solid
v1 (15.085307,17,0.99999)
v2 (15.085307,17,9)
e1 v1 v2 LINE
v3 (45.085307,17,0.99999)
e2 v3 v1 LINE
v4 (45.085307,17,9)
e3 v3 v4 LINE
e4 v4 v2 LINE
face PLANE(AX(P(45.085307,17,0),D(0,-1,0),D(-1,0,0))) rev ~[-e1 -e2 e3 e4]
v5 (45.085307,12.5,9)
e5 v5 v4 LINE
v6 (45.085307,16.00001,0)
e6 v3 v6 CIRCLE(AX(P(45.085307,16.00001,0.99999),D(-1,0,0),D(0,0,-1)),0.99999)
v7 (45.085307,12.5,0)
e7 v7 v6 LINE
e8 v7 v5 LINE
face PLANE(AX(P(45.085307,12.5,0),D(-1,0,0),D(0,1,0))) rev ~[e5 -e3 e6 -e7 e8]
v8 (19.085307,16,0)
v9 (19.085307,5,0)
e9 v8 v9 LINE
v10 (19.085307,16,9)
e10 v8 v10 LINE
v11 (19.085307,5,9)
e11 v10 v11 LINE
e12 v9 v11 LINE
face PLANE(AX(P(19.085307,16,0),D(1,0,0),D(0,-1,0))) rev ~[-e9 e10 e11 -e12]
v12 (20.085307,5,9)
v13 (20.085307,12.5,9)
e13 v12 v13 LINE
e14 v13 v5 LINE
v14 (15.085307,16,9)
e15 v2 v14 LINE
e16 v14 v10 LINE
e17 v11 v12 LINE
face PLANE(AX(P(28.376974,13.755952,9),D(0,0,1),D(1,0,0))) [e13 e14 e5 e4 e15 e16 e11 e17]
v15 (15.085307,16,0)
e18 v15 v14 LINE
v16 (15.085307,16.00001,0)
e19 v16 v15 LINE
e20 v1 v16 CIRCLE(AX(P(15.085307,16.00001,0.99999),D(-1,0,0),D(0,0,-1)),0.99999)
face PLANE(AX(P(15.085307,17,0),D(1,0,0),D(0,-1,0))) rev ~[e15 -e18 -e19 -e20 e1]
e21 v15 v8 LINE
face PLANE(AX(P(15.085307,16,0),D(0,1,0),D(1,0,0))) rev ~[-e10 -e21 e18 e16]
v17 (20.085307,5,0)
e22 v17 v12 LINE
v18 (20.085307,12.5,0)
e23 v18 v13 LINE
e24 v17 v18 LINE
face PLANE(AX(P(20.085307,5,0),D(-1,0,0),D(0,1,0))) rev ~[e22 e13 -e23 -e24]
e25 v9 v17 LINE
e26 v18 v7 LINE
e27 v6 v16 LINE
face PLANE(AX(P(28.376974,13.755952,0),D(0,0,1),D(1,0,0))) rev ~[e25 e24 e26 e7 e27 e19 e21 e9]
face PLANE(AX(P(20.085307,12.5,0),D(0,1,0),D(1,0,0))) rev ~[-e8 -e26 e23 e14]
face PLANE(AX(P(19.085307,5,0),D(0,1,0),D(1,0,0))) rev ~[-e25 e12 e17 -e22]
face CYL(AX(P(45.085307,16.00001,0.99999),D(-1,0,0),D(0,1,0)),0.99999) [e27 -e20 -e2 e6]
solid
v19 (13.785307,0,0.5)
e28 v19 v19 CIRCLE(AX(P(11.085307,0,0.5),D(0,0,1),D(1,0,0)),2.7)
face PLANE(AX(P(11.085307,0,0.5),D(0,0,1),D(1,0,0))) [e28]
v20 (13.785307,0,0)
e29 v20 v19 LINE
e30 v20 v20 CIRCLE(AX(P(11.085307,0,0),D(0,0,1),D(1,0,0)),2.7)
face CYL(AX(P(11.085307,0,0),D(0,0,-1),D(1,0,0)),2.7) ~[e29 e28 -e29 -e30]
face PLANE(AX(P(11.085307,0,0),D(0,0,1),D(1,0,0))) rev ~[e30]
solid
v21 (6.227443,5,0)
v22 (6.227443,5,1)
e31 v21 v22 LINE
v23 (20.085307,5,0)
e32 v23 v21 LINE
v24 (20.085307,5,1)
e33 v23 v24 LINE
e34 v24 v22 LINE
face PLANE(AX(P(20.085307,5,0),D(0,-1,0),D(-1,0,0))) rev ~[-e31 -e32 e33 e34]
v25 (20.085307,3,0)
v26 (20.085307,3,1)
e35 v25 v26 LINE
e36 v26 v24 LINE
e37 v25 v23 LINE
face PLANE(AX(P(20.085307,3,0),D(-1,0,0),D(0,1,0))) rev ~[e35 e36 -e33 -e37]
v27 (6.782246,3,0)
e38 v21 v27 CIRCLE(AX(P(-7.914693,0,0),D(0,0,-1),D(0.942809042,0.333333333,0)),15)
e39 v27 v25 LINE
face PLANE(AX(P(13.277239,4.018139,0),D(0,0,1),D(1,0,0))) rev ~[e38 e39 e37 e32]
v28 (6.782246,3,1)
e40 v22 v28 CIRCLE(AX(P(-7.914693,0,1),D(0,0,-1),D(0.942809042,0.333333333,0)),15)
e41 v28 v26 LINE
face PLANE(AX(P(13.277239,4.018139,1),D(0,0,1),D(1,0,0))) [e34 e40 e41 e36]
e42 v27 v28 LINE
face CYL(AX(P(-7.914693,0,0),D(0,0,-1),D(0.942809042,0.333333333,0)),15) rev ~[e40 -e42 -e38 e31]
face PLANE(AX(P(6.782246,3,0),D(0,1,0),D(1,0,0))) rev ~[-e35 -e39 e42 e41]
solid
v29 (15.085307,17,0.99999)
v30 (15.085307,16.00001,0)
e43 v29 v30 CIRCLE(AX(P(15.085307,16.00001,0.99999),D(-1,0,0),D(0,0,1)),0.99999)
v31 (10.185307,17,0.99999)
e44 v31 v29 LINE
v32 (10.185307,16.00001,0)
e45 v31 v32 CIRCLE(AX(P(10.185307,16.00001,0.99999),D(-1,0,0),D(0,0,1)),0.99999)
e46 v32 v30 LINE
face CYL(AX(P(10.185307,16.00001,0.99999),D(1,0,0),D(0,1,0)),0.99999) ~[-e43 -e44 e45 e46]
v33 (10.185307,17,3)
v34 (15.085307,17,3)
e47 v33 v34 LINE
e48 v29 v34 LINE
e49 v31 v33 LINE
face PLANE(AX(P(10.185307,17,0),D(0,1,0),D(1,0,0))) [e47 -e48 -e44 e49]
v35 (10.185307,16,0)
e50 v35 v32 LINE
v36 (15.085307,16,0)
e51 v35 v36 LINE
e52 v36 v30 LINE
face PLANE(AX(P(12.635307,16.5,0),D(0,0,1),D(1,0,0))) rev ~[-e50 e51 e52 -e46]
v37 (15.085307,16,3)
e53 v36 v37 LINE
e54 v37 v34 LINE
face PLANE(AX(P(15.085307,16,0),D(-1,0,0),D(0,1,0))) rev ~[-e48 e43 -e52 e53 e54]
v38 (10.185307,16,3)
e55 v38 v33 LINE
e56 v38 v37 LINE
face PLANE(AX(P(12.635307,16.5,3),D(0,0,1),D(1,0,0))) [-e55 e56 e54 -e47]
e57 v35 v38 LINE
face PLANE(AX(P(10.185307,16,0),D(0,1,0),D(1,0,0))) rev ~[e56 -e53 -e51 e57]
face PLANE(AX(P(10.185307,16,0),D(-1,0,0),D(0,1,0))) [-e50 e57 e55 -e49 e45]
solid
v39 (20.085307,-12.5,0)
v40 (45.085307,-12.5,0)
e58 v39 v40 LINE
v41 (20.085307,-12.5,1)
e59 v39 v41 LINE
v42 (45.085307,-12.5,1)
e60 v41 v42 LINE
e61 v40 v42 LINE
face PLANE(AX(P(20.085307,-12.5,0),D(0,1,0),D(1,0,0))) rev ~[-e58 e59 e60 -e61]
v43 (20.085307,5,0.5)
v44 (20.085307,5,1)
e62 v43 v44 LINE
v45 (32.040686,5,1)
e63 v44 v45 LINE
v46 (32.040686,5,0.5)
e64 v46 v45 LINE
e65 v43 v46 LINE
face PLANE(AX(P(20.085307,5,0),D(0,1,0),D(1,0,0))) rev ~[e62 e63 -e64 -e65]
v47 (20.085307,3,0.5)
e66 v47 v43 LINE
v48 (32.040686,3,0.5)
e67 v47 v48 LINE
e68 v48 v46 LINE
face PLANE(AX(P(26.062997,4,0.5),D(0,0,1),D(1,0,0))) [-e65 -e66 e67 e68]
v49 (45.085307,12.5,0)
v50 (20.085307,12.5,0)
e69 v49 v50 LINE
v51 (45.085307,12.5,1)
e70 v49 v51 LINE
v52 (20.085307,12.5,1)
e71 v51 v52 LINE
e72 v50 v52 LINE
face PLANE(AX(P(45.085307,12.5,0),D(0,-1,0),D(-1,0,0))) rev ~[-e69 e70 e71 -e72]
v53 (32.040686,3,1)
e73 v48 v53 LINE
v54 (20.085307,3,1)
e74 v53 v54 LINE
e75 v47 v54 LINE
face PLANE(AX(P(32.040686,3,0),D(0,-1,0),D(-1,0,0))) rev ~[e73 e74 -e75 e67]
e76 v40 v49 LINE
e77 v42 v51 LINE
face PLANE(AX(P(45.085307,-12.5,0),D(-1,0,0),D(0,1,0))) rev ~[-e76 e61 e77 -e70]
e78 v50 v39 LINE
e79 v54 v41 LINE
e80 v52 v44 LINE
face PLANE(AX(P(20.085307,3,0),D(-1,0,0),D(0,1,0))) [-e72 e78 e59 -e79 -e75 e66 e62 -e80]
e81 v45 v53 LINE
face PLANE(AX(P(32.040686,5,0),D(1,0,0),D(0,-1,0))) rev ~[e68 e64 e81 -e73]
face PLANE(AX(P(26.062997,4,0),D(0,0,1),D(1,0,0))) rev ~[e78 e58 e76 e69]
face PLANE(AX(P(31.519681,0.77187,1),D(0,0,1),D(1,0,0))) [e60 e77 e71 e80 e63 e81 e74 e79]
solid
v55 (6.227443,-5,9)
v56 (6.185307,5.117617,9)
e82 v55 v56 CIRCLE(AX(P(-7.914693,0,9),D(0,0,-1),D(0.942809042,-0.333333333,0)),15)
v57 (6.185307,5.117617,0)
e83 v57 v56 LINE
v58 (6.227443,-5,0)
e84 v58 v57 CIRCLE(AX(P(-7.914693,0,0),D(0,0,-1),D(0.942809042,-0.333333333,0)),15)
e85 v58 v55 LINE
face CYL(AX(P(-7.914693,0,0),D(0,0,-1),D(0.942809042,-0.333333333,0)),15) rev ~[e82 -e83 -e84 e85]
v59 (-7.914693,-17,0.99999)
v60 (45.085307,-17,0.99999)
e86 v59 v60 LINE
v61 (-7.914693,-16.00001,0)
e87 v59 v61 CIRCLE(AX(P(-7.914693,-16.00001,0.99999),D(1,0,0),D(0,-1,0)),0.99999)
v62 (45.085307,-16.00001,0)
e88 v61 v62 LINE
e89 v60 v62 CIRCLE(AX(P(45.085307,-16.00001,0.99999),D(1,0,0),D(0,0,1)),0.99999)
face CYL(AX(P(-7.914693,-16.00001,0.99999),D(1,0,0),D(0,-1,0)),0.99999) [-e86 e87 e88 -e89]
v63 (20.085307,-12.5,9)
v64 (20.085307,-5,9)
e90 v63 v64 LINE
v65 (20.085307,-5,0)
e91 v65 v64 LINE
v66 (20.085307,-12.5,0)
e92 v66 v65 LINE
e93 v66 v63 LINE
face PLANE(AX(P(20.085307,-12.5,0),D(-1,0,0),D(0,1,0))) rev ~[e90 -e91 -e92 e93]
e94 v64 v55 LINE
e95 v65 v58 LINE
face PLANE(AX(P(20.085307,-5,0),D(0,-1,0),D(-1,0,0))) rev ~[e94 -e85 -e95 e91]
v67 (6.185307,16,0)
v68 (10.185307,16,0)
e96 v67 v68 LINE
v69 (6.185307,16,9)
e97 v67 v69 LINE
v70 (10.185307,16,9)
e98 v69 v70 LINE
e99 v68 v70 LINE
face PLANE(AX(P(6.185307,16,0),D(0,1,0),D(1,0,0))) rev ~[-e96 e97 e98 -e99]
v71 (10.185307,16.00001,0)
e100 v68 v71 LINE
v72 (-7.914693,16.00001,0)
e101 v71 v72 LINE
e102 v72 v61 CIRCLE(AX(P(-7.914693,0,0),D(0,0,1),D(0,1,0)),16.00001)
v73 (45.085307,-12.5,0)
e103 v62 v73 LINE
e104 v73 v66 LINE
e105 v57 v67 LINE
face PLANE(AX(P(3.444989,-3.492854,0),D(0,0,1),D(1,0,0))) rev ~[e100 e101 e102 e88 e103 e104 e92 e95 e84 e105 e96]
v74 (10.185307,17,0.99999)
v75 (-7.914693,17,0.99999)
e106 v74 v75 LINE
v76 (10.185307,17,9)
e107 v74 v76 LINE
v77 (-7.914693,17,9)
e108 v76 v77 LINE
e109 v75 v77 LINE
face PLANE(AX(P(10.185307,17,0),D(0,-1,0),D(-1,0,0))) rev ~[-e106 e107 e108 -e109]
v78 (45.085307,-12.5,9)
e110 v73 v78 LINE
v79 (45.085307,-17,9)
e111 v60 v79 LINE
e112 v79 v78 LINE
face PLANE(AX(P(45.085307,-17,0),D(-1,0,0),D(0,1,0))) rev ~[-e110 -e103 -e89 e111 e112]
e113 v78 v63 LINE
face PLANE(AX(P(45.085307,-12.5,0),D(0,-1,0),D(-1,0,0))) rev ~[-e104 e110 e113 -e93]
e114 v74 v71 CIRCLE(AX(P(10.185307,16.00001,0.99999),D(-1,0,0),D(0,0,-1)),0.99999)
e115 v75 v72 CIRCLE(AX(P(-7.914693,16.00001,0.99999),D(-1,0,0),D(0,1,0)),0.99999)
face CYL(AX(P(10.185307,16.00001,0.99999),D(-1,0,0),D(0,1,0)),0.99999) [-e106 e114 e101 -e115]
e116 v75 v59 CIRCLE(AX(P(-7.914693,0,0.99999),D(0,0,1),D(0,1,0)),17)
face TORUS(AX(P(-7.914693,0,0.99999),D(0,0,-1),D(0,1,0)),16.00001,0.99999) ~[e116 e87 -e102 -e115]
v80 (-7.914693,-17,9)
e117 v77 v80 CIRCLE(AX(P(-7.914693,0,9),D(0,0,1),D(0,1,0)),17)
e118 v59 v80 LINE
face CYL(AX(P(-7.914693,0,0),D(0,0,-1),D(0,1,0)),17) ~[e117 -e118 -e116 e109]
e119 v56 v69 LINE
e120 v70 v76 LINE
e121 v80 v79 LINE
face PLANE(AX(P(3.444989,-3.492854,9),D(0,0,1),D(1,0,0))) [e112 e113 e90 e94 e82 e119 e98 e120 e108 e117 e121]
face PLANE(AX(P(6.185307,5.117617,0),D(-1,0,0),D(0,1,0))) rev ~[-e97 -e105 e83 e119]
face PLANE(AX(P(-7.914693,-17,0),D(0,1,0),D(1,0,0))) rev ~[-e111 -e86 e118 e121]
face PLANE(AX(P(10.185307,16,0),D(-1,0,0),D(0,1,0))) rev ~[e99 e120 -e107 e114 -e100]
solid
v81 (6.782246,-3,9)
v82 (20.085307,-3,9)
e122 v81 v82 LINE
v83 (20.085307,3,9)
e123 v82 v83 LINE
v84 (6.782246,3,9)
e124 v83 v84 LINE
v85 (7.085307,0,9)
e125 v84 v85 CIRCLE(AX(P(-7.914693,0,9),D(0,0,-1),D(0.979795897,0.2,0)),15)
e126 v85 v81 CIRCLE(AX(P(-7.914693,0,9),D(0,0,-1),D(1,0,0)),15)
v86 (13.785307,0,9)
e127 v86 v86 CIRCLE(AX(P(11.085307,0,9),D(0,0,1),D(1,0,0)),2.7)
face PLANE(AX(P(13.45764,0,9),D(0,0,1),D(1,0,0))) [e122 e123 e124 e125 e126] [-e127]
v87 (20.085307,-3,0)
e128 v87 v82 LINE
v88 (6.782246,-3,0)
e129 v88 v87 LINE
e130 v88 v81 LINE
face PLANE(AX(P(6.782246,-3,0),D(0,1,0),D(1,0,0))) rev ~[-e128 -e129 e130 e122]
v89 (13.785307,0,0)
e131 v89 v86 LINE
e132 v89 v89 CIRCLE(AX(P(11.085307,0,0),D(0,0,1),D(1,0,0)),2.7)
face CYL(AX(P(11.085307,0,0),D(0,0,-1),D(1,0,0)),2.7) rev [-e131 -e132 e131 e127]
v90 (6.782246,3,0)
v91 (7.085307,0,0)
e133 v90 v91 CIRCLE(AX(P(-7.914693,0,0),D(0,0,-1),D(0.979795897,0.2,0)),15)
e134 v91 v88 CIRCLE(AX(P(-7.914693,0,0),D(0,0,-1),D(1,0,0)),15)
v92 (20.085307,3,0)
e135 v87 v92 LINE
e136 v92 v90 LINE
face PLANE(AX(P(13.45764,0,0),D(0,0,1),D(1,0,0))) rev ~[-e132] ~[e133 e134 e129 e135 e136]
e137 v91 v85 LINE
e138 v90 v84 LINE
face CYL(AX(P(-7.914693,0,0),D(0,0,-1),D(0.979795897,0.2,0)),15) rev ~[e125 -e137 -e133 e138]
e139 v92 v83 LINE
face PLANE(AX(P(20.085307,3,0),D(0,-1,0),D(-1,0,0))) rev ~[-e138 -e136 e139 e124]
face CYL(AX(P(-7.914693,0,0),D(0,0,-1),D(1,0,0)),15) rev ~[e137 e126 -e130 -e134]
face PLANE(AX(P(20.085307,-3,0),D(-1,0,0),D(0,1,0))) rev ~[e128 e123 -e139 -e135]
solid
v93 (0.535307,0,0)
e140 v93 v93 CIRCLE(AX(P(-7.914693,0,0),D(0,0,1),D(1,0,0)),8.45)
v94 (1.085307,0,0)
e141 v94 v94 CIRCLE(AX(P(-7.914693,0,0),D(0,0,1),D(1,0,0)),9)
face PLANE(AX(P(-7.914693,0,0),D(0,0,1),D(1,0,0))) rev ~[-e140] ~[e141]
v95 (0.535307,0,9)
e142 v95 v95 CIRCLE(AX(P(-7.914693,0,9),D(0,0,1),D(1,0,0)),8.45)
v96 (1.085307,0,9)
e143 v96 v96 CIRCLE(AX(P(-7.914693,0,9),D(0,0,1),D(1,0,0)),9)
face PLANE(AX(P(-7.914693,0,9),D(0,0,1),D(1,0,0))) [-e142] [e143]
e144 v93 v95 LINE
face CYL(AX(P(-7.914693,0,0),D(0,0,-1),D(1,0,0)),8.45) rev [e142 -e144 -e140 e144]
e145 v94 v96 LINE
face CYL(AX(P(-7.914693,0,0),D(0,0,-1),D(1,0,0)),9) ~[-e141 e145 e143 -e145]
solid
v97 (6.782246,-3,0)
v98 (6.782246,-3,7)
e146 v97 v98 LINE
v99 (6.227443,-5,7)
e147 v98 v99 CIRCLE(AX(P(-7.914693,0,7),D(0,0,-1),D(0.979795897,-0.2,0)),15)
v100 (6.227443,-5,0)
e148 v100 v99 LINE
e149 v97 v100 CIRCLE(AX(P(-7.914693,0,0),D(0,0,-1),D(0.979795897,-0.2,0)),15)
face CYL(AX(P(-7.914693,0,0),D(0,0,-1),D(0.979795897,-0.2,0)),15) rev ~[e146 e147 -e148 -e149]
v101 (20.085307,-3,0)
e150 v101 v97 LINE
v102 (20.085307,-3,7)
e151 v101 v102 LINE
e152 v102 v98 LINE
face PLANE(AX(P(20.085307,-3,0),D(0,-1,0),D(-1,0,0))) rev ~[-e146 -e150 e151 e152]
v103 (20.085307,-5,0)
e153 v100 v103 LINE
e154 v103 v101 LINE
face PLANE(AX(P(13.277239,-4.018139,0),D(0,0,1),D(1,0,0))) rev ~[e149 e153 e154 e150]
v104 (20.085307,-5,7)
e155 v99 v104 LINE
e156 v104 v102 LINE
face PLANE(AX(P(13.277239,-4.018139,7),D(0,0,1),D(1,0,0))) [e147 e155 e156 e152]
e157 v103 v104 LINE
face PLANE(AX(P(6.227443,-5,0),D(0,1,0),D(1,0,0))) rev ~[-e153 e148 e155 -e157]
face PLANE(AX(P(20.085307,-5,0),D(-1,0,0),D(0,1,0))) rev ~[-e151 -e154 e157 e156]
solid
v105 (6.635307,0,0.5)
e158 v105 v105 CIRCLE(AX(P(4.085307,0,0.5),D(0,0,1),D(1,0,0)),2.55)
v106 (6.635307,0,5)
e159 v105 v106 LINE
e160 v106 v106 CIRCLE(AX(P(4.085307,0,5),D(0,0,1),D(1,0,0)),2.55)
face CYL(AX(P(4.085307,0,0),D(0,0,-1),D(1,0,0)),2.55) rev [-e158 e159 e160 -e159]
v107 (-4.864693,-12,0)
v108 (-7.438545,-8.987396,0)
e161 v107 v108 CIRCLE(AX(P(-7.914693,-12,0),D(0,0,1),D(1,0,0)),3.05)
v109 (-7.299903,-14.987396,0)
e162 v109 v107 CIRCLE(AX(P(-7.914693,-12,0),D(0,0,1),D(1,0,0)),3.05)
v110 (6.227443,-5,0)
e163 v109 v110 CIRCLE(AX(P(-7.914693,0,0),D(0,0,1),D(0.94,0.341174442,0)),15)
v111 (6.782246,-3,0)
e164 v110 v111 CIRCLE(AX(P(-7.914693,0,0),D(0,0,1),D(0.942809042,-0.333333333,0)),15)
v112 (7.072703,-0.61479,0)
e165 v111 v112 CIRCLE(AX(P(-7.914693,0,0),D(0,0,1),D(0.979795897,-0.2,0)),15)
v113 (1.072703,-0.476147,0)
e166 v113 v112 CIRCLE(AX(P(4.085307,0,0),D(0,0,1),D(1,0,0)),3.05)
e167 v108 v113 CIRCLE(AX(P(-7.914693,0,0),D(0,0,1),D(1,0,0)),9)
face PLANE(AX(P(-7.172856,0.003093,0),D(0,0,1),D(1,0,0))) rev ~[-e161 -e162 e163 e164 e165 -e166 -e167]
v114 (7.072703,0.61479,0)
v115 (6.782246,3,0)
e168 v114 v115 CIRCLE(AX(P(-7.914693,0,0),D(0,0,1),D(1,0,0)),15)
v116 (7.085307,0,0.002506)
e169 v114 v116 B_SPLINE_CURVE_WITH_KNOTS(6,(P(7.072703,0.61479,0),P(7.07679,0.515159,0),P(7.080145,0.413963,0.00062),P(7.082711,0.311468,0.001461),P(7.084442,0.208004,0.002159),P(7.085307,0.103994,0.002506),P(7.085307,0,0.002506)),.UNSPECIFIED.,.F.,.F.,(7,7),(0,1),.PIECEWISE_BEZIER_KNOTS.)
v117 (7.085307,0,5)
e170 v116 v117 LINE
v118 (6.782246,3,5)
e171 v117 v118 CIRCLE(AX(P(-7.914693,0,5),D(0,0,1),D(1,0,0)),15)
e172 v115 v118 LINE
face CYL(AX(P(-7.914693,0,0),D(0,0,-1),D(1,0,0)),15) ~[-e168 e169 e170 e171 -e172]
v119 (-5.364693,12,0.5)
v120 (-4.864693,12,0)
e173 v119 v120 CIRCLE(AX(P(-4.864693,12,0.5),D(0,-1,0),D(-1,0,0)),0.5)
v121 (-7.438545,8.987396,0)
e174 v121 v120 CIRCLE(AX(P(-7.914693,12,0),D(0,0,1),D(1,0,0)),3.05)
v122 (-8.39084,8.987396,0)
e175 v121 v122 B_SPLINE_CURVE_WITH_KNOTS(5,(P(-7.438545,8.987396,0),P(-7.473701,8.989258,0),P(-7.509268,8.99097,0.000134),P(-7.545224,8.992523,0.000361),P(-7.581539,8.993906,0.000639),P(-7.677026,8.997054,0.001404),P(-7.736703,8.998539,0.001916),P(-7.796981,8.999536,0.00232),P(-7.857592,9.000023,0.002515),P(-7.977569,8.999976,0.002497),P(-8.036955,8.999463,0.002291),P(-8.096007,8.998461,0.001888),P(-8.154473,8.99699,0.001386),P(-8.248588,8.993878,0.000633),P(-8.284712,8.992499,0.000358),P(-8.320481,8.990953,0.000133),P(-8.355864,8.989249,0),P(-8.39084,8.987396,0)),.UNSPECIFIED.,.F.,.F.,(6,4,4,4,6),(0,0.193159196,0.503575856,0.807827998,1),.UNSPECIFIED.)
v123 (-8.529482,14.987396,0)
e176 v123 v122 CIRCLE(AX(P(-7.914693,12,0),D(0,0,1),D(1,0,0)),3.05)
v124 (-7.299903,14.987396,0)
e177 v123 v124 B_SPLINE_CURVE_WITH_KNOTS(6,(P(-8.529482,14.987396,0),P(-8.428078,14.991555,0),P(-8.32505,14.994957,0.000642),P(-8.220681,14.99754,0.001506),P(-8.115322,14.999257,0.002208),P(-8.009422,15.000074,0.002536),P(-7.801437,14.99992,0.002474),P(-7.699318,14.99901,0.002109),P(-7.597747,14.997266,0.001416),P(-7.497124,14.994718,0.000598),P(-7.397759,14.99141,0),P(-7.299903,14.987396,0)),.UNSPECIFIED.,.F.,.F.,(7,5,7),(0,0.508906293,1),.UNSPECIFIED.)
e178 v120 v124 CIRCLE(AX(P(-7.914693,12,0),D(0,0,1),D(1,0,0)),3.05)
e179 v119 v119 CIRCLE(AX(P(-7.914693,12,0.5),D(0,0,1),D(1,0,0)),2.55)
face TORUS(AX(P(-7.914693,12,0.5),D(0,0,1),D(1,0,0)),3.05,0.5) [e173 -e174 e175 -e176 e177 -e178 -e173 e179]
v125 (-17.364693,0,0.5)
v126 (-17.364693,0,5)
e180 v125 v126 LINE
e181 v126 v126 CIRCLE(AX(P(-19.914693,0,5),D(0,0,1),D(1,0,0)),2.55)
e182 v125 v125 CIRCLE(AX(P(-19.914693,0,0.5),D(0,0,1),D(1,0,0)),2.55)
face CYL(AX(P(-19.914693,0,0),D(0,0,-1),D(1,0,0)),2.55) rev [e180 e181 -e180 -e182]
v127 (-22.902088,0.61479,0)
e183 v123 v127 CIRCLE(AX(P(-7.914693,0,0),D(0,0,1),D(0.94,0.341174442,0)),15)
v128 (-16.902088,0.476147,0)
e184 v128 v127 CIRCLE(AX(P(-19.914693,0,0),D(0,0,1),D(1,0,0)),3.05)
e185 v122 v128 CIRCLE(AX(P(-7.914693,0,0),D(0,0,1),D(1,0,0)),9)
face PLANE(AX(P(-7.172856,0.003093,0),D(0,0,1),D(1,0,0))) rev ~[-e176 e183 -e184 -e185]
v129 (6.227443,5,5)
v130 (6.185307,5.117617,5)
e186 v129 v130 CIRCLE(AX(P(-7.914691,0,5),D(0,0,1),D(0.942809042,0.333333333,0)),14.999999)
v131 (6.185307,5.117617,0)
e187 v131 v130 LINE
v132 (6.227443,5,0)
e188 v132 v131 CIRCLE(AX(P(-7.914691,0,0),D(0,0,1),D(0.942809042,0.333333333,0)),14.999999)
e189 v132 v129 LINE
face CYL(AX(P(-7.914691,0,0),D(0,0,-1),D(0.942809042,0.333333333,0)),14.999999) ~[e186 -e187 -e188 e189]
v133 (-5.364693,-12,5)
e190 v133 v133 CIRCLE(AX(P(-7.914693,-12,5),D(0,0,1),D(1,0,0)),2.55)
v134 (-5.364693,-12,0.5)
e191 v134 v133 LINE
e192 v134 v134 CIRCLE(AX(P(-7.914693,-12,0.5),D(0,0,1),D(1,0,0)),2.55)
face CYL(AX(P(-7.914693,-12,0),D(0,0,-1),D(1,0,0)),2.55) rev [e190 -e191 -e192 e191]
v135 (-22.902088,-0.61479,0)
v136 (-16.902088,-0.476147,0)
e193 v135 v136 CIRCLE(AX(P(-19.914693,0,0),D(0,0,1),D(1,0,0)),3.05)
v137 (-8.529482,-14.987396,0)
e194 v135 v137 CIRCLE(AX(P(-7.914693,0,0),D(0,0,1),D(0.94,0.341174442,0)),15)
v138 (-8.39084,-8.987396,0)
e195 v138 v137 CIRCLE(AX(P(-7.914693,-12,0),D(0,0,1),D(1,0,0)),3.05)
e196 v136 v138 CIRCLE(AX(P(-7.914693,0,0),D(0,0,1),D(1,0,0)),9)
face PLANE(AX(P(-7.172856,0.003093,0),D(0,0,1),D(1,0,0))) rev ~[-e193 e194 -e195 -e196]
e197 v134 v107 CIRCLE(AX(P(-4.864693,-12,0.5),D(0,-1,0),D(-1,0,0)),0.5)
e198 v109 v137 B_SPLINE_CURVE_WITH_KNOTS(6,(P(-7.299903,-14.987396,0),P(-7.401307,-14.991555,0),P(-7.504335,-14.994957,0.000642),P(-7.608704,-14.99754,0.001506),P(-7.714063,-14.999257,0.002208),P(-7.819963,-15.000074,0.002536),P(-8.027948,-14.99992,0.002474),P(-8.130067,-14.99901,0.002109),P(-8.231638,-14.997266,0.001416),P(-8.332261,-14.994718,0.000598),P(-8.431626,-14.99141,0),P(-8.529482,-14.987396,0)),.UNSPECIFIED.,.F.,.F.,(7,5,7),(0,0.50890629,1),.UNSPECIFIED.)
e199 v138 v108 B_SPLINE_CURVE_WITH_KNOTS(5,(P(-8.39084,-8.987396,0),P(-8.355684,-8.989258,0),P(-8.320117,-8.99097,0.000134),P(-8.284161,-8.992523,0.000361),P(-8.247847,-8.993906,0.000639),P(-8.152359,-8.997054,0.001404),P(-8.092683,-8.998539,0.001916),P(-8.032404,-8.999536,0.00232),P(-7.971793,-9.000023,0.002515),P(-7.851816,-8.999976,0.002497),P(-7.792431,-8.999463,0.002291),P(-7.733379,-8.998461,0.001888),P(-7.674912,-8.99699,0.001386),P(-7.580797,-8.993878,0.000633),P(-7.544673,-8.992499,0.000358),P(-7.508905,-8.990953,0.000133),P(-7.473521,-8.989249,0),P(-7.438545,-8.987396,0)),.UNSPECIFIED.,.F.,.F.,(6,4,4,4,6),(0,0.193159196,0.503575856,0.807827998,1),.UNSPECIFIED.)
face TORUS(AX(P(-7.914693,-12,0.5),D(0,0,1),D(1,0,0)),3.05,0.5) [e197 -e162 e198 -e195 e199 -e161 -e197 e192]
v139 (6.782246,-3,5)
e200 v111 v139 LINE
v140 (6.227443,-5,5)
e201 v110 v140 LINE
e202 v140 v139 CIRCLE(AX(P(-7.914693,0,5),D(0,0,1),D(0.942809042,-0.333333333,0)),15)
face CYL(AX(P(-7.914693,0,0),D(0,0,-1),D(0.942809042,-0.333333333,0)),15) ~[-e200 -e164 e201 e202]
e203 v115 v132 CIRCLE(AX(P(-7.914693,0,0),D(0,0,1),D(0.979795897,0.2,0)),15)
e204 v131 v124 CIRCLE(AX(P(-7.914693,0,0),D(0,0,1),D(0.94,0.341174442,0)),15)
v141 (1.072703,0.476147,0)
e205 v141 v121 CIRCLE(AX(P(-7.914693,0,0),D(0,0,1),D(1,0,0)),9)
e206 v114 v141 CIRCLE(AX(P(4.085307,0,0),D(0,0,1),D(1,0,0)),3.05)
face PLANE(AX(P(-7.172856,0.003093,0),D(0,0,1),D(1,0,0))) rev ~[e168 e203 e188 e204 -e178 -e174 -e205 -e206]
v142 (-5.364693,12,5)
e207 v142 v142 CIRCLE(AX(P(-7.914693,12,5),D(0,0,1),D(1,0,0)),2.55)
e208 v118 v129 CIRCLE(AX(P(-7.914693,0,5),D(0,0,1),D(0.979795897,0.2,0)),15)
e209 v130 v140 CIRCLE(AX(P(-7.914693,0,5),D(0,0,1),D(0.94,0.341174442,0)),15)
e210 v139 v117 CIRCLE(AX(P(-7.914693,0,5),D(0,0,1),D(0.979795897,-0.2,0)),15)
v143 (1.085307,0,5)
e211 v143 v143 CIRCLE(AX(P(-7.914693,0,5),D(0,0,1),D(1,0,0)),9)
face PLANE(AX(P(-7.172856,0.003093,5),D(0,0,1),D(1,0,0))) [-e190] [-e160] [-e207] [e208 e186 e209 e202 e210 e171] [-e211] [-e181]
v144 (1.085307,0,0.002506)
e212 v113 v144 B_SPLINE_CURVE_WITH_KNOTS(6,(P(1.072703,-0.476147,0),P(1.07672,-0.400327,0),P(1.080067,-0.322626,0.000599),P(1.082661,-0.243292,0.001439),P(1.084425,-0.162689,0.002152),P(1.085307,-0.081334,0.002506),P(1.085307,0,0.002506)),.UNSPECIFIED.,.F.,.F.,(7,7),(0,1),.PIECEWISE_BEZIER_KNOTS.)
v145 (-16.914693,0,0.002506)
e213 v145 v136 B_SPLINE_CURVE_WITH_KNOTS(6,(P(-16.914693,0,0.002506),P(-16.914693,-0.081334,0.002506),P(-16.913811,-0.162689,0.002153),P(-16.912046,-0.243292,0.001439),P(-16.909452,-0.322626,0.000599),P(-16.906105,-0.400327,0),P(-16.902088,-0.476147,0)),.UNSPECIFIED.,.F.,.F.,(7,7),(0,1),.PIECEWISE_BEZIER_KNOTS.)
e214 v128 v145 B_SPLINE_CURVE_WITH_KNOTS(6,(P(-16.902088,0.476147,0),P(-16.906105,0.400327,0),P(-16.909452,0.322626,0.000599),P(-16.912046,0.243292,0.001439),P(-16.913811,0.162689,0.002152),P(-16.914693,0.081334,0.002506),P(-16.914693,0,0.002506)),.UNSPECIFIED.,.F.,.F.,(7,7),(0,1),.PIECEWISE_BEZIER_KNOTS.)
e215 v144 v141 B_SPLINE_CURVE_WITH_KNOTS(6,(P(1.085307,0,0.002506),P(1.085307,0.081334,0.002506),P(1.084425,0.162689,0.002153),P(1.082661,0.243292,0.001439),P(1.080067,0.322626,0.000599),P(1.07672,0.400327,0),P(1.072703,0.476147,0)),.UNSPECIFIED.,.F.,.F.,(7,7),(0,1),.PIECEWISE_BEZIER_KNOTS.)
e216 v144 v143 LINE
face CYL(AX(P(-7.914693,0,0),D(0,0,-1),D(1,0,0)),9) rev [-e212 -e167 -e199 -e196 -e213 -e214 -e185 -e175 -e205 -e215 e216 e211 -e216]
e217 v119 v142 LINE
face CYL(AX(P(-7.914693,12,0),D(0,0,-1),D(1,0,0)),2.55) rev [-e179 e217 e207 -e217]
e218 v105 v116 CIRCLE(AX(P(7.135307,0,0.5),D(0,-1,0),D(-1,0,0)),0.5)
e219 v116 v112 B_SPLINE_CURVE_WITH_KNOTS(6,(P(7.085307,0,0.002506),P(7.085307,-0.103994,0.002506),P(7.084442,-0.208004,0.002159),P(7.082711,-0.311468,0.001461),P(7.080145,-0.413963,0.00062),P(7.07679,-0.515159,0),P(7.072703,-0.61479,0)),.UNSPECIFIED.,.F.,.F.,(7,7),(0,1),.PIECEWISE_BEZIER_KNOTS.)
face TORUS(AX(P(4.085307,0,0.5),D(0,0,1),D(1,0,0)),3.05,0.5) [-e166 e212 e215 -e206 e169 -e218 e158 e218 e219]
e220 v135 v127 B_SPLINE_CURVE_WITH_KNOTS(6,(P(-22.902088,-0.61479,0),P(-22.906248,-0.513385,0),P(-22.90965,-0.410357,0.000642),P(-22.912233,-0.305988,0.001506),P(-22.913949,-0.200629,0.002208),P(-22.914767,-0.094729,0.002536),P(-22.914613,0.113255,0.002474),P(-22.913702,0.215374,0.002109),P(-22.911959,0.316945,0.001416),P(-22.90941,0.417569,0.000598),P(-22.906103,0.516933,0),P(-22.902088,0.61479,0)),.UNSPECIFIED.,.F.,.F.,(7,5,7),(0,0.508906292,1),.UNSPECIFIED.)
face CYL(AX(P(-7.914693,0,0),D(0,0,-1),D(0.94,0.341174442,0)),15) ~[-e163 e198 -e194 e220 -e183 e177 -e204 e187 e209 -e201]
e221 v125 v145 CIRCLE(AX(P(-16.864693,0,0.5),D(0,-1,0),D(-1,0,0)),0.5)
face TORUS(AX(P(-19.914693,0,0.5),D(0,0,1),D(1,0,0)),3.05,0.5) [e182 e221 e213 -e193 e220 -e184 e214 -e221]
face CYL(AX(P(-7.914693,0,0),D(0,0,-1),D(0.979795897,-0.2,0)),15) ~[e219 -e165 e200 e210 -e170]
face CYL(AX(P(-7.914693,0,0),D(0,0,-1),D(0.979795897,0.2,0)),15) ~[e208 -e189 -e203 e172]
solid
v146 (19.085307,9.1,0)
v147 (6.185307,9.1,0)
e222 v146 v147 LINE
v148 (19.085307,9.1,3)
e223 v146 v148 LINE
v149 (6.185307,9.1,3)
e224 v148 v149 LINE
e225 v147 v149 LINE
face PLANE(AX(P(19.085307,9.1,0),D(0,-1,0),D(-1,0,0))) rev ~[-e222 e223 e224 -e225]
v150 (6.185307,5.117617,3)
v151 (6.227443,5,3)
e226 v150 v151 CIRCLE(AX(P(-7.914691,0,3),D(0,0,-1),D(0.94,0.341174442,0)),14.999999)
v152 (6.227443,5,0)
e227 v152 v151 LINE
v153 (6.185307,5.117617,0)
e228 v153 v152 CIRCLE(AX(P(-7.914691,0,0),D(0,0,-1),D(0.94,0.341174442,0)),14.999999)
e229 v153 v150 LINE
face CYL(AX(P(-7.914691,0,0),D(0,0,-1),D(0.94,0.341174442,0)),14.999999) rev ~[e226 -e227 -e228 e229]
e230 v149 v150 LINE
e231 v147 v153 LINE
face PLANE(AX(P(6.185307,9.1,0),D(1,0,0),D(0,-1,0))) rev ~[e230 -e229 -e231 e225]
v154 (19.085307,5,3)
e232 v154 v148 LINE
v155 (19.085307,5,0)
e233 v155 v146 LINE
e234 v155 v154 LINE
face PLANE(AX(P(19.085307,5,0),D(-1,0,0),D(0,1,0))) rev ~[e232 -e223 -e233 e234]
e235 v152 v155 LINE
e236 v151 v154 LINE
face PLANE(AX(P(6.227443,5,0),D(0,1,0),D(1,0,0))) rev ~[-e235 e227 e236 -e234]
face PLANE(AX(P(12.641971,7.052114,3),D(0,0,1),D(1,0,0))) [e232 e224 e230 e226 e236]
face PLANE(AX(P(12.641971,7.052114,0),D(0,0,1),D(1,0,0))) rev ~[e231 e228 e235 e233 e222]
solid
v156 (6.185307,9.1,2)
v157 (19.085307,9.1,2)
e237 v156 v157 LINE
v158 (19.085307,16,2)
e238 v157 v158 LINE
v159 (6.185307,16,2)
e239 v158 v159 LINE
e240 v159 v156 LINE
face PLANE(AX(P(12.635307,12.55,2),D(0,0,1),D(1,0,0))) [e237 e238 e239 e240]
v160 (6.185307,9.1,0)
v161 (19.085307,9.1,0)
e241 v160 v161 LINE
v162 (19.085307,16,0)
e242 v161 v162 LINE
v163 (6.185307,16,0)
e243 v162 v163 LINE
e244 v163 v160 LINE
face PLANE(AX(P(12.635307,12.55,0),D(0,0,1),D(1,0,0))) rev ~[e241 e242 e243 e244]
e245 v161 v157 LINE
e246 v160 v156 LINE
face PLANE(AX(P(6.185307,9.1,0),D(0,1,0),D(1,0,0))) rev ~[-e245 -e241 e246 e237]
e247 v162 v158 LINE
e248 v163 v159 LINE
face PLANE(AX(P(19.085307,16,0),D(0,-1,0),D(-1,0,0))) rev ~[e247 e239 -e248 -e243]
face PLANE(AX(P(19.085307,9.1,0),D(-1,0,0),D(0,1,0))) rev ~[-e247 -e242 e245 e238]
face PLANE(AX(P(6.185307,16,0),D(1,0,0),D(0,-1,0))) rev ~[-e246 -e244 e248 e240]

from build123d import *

# Parameters (mm, degrees)
F1_DEPTH = 9
F0_R     = 2.7
F0_R_2   = 9
F0_R_3   = 8.45
F2_DEPTH = 1
F3_DEPTH = 2
F0_W     = 11.9553784338
F0_H     = 2
F4_DEPTH = 0.5
F5_DEPTH = 7
F0_R_4   = 2.55
F6_DEPTH = 5
F7_DEPTH = 3
F0_W_2   = 4.9
F0_H_2   = 1
F9_R     = 0.99999
F9_2_R   = 0.99999
F9_3_R   = 0.99999


# Not quite as in the source:
# - a fillet or chamfer that OpenCascade refuses, or shapes differently, is made with other operations: its cross-section is extruded or revolved along the edge and cut away or added
# - a fillet or chamfer is up to 0.001 mm smaller than in the source, because OpenCascade refuses the exact size


with BuildPart() as f1:
    # F0 (on Top) → F1 (new body)
    with BuildSketch(Plane.XY):
        with BuildLine():
            Line((10.1853074353, 17), (-7.9146925647, 17))
            ThreePointArc((-7.9146925647, 17), (-24.9146925647, 0), (-7.9146925647, -17))
            Line((-7.9146925647, -17), (45.0853074353, -17))
            Line((45.0853074353, -17), (45.0853074353, -12.5))
            Line((45.0853074353, -12.5), (20.0853074353, -12.5))
            Line((20.0853074353, -12.5), (20.0853074353, -5))
            Line((20.0853074353, -5), (6.227443059, -5))
            ThreePointArc((6.227443059, -5), (-22.9145624885, -0.0624681581), (6.1853074353, 5.1176166328))
            Line((6.1853074353, 5.1176166328), (6.1853074353, 6))
            Line((6.1853074353, 6), (6.1853074353, 9.1))
            Line((6.1853074353, 9.1), (6.1853074353, 16))
            Line((6.1853074353, 16), (10.1853074353, 16))
            Line((10.1853074353, 16), (10.1853074353, 17))
        make_face()
    extrude(amount=F1_DEPTH)

    # F9 (radius 1 in the source; OpenCascade refuses exactly that, so slightly less here)
    f9_edges = [f1.edges().sort_by_distance(p)[0] for p in [
        (1.135307, 17, 0),
        (-24.914693, 0, 0),
        (18.585307, -17, 0),
    ]]
    fillet(f9_edges, radius=F9_R)


with BuildPart() as f1b:
    # F0 (on Top) → F1, piece 2 (new body)
    with BuildSketch(Plane.XY):
        Polygon((45.0853074353, 17), (15.0853074353, 17), (15.0853074353, 16), (19.0853074353, 16), (19.0853074353, 9.1), (19.0853074353, 6), (19.0853074353, 5), (20.0853074353, 5), (20.0853074353, 12.5), (45.0853074353, 12.5), align=None)
    extrude(amount=F1_DEPTH)

    # F9#2 (radius 1 in the source; OpenCascade refuses exactly that, so slightly less here)
    f9_2_edges = [f1b.edges().sort_by_distance(p)[0] for p in [
        (30.085307, 17, 0),
    ]]
    fillet(f9_2_edges, radius=F9_2_R)


with BuildPart() as f1c:
    # F0 (on Top) → F1, piece 3 (new body)
    with BuildSketch(Plane.XY):
        with BuildLine():
            Line((6.782245892, -3), (20.0853074353, -3))
            Line((20.0853074353, -3), (20.0853074353, 3))
            Line((20.0853074353, 3), (6.782245892, 3))
            ThreePointArc((6.782245892, 3), (7.0093497304, 1.5076344301), (7.0853074353, 0))
            ThreePointArc((7.0853074353, 0), (7.0093497304, -1.5076344301), (6.782245892, -3))
        make_face()
        with Locations((11.0853074353, 0)):
            Circle(F0_R, mode=Mode.SUBTRACT)
    extrude(amount=F1_DEPTH)


with BuildPart() as f1d:
    # F0 (on Top) → F1, piece 4 (new body)
    with BuildSketch(Plane.XY):
        with Locations((-7.9146925647, 0)):
            Circle(F0_R_2)
        with Locations((-7.9146925647, 0)):
            Circle(F0_R_3, mode=Mode.SUBTRACT)
    extrude(amount=F1_DEPTH)


with BuildPart() as f2:
    # F0 (on Top) → F2 (new body)
    with BuildSketch(Plane.XY):
        Polygon((20.0853074353, -12.5), (45.0853074353, -12.5), (45.0853074353, 12.5), (20.0853074353, 12.5), (20.0853074353, 5), (32.0406858691, 5), (32.0406858691, 3), (20.0853074353, 3), (20.0853074353, -3), (20.0853074353, -5), align=None)
    extrude(amount=F2_DEPTH)

    # F0 (on Top) → F4 (join)
    with BuildSketch(Plane.XY):
        with Locations((26.0629966522, 4)):
            Rectangle(F0_W, F0_H)
    extrude(amount=F4_DEPTH)


with BuildPart() as f2b:
    # F0 (on Top) → F2, piece 2 (new body)
    with BuildSketch(Plane.XY):
        with BuildLine():
            Line((20.0853074353, 3), (20.0853074353, 5))
            Line((20.0853074353, 5), (19.0853074353, 5))
            Line((19.0853074353, 5), (6.227443059, 5))
            ThreePointArc((6.227443059, 5), (6.5394780602, 4.0096074055), (6.782245892, 3))
            Line((6.782245892, 3), (20.0853074353, 3))
        make_face()
    extrude(amount=F2_DEPTH)


with BuildPart() as f3:
    # F0 (on Top) → F3 (new body)
    with BuildSketch(Plane.XY):
        Polygon((15.0853074353, 16), (10.1853074353, 16), (6.1853074353, 16), (6.1853074353, 9.1), (19.0853074353, 9.1), (19.0853074353, 16), align=None)
    extrude(amount=F3_DEPTH)


with BuildPart() as f4:
    # F0 (on Top) → F4, piece 2 (new body)
    with BuildSketch(Plane.XY):
        with Locations((11.0853074353, 0)):
            Circle(F0_R)
    extrude(amount=F4_DEPTH)


with BuildPart() as f5:
    # F0 (on Top) → F5 (new body)
    with BuildSketch(Plane.XY):
        with BuildLine():
            Line((6.227443059, -5), (20.0853074353, -5))
            Line((20.0853074353, -5), (20.0853074353, -3))
            Line((20.0853074353, -3), (6.782245892, -3))
            ThreePointArc((6.782245892, -3), (6.5394780602, -4.0096074055), (6.227443059, -5))
        make_face()
    extrude(amount=F5_DEPTH)


with BuildPart() as f6:
    # F0 (on Top) → F6 (new body)
    with BuildSketch(Plane.XY):
        with BuildLine():
            ThreePointArc((6.227443059, 5), (6.2064977026, 5.0588521855), (6.1853074353, 5.1176166328))
            ThreePointArc((6.1853074353, 5.1176166328), (-22.9145624885, -0.0624681581), (6.227443059, -5))
            ThreePointArc((6.227443059, -5), (6.5394780602, -4.0096074055), (6.782245892, -3))
            ThreePointArc((6.782245892, -3), (7.0093497304, -1.5076344301), (7.0853074353, 0))
            ThreePointArc((7.0853074353, 0), (7.0093497304, 1.5076344301), (6.782245892, 3))
            ThreePointArc((6.782245892, 3), (6.5394780602, 4.0096074055), (6.227443059, 5))
        make_face()
        with Locations((-7.9146925647, -12)):
            Circle(F0_R_4, mode=Mode.SUBTRACT)
        with Locations((-19.9146925647, 0)):
            Circle(F0_R_4, mode=Mode.SUBTRACT)
        with Locations((-7.9146925647, 0)):
            Circle(F0_R_2, mode=Mode.SUBTRACT)
        with Locations((4.0853074353, 0)):
            Circle(F0_R_4, mode=Mode.SUBTRACT)
        with Locations((-7.9146925647, 12)):
            Circle(F0_R_4, mode=Mode.SUBTRACT)
    extrude(amount=F6_DEPTH)

    # F8: fillet of radius 0.5 on 4 edges, made by hand

    # F8_s1 → F8_t2 (revolve, cut)
    with BuildSketch(Plane.XZ):
        with BuildLine():
            ThreePointArc((-17.3646925647, 0.5), (-17.2182459553, 0.1464466094), (-16.8646925647, 0))
            Line((-16.8646925647, 0), (-17.3646925647, 0))
            Line((-17.3646925647, 0), (-17.3646925647, 0.5))
        make_face()
    revolve(axis=Axis((-19.9146925647, 0, 0), (0, 0, 1)), mode=Mode.SUBTRACT)

    # F8_s3 → F8_t4 (revolve, cut)
    with BuildSketch(Plane.XZ.offset(12)):
        with BuildLine():
            ThreePointArc((-5.3646925647, 0.5), (-5.2182459553, 0.1464466094), (-4.8646925647, 0))
            Line((-4.8646925647, 0), (-5.3646925647, 0))
            Line((-5.3646925647, 0), (-5.3646925647, 0.5))
        make_face()
    revolve(axis=Axis((-7.9146925647, -12, 0), (0, 0, 1)), mode=Mode.SUBTRACT)

    # F8_s5 → F8_t6 (revolve, cut)
    with BuildSketch(Plane.XZ):
        with BuildLine():
            ThreePointArc((6.6353074353, 0.5), (6.7817540447, 0.1464466094), (7.1353074353, 0))
            Line((7.1353074353, 0), (6.6353074353, 0))
            Line((6.6353074353, 0), (6.6353074353, 0.5))
        make_face()
    revolve(axis=Axis((4.0853074353, 0, 0), (0, 0, 1)), mode=Mode.SUBTRACT)

    # F8_s7 → F8_t8 (revolve, cut)
    with BuildSketch(Plane.XZ.offset(-12)):
        with BuildLine():
            ThreePointArc((-5.3646925647, 0.5), (-5.2182459553, 0.1464466094), (-4.8646925647, 0))
            Line((-4.8646925647, 0), (-5.3646925647, 0))
            Line((-5.3646925647, 0), (-5.3646925647, 0.5))
        make_face()
    revolve(axis=Axis((-7.9146925647, 12, 0), (0, 0, 1)), mode=Mode.SUBTRACT)


with BuildPart() as f7:
    # F0 (on Top) → F7 (new body)
    with BuildSketch(Plane.XY):
        with BuildLine():
            Line((19.0853074353, 9.1), (6.1853074353, 9.1))
            Line((6.1853074353, 9.1), (6.1853074353, 6))
            Line((6.1853074353, 6), (6.1853074353, 5.1176166328))
            ThreePointArc((6.1853074353, 5.1176166328), (6.2064977026, 5.0588521855), (6.227443059, 5))
            Line((6.227443059, 5), (19.0853074353, 5))
            Line((19.0853074353, 5), (19.0853074353, 6))
            Line((19.0853074353, 6), (19.0853074353, 9.1))
        make_face()
    extrude(amount=F7_DEPTH)


with BuildPart() as f7b:
    # F0 (on Top) → F7, piece 2 (new body)
    with BuildSketch(Plane.XY):
        with Locations((12.6353074353, 16.5)):
            Rectangle(F0_W_2, F0_H_2)
    extrude(amount=F7_DEPTH)

    # F9#3 (radius 1 in the source; OpenCascade refuses exactly that, so slightly less here)
    f9_3_edges = [f7b.edges().sort_by_distance(p)[0] for p in [
        (12.635307, 17, 0),
    ]]
    fillet(f9_3_edges, radius=F9_3_R)


solid = Compound([f1.part, f1b.part, f1c.part, f1d.part, f2.part, f2b.part, f3.part, f4.part, f5.part, f6.part, f7.part, f7b.part])
